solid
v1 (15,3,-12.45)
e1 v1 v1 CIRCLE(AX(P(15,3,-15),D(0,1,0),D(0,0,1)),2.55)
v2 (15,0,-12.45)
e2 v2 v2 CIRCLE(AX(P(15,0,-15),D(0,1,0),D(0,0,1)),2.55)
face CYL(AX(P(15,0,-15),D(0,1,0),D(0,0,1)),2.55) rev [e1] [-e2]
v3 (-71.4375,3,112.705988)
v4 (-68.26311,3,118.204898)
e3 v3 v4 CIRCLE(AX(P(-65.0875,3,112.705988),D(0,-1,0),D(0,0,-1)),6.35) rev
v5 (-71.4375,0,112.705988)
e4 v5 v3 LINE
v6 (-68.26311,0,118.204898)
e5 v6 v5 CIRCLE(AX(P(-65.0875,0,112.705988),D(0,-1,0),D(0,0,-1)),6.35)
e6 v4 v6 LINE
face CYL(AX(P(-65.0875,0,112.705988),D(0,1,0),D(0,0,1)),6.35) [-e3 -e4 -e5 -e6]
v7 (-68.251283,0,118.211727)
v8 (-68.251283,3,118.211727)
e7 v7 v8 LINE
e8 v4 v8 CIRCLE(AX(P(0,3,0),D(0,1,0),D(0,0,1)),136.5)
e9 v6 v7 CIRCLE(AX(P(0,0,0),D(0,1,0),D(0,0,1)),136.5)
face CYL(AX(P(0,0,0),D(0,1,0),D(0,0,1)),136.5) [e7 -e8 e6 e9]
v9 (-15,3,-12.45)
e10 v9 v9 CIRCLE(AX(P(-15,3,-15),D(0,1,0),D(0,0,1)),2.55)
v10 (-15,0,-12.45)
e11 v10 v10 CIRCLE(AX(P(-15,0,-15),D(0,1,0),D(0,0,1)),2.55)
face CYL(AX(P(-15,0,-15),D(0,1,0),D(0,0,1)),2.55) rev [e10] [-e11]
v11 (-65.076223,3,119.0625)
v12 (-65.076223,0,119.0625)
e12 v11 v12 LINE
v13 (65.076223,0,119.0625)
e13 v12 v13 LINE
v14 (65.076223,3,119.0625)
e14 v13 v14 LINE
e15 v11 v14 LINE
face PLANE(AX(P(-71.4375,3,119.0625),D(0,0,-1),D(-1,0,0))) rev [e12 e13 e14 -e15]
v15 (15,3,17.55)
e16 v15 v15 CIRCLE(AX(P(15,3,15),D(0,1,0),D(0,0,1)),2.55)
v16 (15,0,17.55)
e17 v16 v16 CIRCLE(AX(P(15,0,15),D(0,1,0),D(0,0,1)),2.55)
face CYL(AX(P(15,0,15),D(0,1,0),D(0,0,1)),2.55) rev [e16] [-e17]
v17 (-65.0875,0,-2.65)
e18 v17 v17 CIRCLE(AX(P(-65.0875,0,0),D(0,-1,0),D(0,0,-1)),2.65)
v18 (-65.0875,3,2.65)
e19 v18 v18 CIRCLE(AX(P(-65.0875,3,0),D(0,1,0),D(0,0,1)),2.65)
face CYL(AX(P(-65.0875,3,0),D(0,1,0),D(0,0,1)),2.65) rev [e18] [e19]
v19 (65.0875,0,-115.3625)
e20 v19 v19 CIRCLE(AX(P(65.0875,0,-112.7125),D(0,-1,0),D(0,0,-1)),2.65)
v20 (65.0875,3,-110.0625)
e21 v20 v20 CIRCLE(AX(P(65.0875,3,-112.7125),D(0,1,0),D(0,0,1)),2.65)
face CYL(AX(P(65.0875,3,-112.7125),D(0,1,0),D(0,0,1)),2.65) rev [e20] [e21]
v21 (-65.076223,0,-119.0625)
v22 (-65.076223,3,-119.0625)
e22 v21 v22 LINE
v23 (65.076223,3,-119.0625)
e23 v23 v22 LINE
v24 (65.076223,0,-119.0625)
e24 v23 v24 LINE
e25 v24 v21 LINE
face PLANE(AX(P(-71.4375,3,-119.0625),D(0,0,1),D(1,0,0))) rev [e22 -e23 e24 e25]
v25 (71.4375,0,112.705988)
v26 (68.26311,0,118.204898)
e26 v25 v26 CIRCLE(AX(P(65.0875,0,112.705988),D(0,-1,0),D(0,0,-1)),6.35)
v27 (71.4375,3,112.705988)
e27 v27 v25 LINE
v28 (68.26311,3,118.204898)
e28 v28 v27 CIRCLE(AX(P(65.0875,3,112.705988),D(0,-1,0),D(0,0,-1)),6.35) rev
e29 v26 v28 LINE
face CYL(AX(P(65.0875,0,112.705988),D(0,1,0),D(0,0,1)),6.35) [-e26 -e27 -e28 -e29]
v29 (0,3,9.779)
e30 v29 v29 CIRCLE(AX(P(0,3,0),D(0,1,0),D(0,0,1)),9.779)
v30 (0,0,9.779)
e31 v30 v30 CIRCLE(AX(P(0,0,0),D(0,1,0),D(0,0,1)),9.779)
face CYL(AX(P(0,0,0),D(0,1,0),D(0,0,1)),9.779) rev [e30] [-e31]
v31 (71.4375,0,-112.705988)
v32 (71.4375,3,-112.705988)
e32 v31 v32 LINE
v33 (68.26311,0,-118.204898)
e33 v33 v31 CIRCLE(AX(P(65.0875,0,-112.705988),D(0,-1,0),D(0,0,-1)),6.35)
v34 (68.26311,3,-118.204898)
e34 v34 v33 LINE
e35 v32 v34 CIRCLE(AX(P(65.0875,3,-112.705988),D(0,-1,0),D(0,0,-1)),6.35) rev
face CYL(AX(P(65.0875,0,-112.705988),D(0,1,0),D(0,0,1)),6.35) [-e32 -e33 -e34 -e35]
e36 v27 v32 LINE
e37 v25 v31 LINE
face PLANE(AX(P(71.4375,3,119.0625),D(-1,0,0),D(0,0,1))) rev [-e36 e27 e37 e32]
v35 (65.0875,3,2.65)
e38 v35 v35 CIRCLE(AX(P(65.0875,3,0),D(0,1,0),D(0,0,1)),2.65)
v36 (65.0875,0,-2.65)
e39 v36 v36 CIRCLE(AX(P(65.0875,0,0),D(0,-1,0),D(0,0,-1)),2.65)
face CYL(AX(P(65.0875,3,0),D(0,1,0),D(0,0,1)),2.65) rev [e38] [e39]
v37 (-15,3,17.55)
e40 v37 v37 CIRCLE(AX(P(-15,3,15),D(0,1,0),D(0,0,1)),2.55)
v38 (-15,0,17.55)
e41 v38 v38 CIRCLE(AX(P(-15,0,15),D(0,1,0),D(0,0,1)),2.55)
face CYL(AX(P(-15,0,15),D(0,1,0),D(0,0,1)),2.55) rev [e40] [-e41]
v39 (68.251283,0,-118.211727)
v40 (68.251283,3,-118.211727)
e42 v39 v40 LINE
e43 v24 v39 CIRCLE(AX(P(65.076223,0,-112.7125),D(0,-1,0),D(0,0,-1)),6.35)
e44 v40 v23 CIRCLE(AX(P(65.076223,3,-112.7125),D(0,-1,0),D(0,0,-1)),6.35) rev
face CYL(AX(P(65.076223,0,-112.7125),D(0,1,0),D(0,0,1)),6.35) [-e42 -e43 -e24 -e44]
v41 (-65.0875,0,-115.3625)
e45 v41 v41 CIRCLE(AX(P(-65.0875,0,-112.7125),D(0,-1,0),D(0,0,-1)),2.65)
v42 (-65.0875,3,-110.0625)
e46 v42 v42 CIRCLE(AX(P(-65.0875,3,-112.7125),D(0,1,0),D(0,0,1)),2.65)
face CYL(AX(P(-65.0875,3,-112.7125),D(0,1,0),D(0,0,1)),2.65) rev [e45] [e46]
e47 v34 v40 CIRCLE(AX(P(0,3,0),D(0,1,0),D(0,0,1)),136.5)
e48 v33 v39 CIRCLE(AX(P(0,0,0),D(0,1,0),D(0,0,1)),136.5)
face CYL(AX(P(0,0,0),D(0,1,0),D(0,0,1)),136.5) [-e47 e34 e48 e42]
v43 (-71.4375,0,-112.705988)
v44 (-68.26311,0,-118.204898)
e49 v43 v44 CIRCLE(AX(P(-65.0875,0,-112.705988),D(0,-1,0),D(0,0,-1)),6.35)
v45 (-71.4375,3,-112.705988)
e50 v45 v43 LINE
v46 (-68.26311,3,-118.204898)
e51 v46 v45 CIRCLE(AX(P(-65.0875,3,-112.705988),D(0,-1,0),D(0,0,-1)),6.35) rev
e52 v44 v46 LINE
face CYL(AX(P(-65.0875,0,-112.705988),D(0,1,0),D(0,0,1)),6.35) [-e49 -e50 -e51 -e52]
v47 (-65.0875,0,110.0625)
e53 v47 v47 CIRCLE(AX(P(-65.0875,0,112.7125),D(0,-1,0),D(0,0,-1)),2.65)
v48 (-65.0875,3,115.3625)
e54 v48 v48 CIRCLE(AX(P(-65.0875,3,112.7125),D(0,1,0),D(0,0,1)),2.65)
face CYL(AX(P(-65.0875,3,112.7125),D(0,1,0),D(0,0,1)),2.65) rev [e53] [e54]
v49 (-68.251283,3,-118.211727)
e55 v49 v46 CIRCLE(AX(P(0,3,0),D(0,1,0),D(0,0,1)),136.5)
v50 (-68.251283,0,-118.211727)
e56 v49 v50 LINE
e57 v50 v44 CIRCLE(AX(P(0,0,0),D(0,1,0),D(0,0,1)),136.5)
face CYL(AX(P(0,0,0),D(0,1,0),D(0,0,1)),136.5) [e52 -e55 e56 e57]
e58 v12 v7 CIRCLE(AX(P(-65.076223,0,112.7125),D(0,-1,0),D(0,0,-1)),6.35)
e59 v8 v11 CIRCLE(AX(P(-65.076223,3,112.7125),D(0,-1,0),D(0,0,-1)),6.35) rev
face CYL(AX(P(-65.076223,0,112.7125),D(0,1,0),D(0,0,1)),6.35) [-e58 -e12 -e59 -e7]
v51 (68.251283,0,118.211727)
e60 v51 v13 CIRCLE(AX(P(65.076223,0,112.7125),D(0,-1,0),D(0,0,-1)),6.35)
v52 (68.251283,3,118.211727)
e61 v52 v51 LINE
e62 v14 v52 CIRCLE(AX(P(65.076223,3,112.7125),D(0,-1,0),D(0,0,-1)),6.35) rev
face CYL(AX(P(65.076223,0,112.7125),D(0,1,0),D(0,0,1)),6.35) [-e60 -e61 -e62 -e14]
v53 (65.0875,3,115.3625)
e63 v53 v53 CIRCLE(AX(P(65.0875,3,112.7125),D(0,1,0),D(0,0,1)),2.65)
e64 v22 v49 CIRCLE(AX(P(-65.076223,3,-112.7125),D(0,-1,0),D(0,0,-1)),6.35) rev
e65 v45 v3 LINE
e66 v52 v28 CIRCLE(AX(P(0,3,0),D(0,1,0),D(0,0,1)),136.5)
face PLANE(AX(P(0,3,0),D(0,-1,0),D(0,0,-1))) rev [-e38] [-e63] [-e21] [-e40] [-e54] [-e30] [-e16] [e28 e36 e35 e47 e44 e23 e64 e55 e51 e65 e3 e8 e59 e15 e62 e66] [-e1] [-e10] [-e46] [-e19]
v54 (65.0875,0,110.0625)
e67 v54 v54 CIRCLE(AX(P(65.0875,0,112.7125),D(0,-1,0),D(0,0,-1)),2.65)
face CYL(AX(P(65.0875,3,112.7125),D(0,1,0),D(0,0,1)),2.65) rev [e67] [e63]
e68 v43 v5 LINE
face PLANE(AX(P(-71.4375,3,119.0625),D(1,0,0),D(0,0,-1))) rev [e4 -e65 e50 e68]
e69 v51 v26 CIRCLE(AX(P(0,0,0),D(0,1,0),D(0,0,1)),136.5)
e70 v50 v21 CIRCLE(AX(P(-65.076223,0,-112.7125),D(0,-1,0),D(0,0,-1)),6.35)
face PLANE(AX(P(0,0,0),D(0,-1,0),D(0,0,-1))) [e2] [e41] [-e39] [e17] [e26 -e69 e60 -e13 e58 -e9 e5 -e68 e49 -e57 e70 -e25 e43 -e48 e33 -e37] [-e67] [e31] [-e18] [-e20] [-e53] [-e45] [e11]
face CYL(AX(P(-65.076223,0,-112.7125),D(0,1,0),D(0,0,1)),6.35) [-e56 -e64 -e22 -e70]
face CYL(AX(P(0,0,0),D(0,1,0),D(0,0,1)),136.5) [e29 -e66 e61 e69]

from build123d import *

# Parameters (mm, degrees)
SKETCH1_W            = 142.875
SKETCH1_H            = 238.125
BOSS_EXTRUDE1_DEPTH  = 3
CUT_EXTRUDE1_START   = -3
CUT_EXTRUDE1_DEPTH   = 3
M5_CLEARANCE_HOLE1_D = 5.3
SKETCH5_R            = 9.779
SKETCH5_R_2          = 2.55
CUT_EXTRUDE2_DEPTH   = 139.881947396
FILLET1_R            = 6.35


# Read off the part's stored shape, not the designer's step: Cut-Extrude1
with BuildPart() as part:
    # Sketch1 → Boss-Extrude1 (new body)
    with BuildSketch(Plane(origin=(0, 0, 0), x_dir=(1, 0, 0), z_dir=(0, 1, 0))):
        Rectangle(SKETCH1_W, SKETCH1_H)
    extrude(amount=BOSS_EXTRUDE1_DEPTH)

    # Cut-Extrude1 outline → Cut-Extrude1 (cut)
    with BuildSketch(Plane(origin=(0, 3, 0), x_dir=(1, 0, 0), z_dir=(0, 1, 0)).offset(CUT_EXTRUDE1_START)):
        with BuildLine():
            ThreePointArc((71.4375, -116.313944107), (69.11044358, -117.711497264), (66.756056607, -119.0625))
            Line((66.756056607, -119.0625), (71.4375, -119.0625))
            Line((71.4375, -119.0625), (71.4375, -116.313944107))
        make_face()
        with BuildLine():
            Line((-71.4375, -119.0625), (-66.756056607, -119.0625))
            ThreePointArc((-66.756056607, -119.0625), (-69.11044358, -117.711497264), (-71.4375, -116.313944107))
            Line((-71.4375, -116.313944107), (-71.4375, -119.0625))
        make_face()
        with BuildLine():
            ThreePointArc((66.756056607, 119.0625), (69.11044358, 117.711497264), (71.4375, 116.313944107))
            Line((71.4375, 116.313944107), (71.4375, 119.0625))
            Line((71.4375, 119.0625), (66.756056607, 119.0625))
        make_face()
        with BuildLine():
            Line((-71.4375, 119.0625), (-71.4375, 116.313944107))
            ThreePointArc((-71.4375, 116.313944107), (-69.11044358, 117.711497264), (-66.756056607, 119.0625))
            Line((-66.756056607, 119.0625), (-71.4375, 119.0625))
        make_face()
    extrude(amount=CUT_EXTRUDE1_DEPTH, mode=Mode.SUBTRACT)

    # M5 Clearance Hole1 (through all)
    with Locations(Plane(origin=(0, 3, 0), x_dir=(1, 0, 0), z_dir=(0, 1, 0))):
        with Locations((65.0875, 0), (-65.0875, 112.7125), (65.0875, 112.7125), (65.0875, -112.7125), (-65.0875, -112.7125), (-65.0875, 0)):
            Hole(M5_CLEARANCE_HOLE1_D / 2)

    # Sketch5 → Cut-Extrude2 (cut, through all)
    with BuildSketch(Plane(origin=(0, 3, 0), x_dir=(1, 0, 0), z_dir=(0, 1, 0))):
        with Locations(Location((0, 0, 0), (0, 0, 270))):
            Circle(SKETCH5_R)
        with Locations(Location((-15, 15, 0), (0, 0, 270))):
            Circle(SKETCH5_R_2)
        with Locations(Location((15, 15, 0), (0, 0, 270))):
            Circle(SKETCH5_R_2)
        with Locations(Location((15, -15, 0), (0, 0, 270))):
            Circle(SKETCH5_R_2)
        with Locations(Location((-15, -15, 0), (0, 0, 270))):
            Circle(SKETCH5_R_2)
    extrude(amount=-CUT_EXTRUDE2_DEPTH, mode=Mode.SUBTRACT)

    # Fillet1
    fillet1_edges = [part.edges().sort_by_distance(p)[0] for p in [
        (71.4375, 1.5, 116.313944107),
        (71.4375, 1.5, -116.313944107),
        (66.756056607, 1.5, -119.0625),
        (-66.756056607, 1.5, -119.0625),
        (-71.4375, 1.5, -116.313944107),
        (-71.4375, 1.5, 116.313944107),
        (-66.756056607, 1.5, 119.0625),
        (66.756056607, 1.5, 119.0625),
    ]]
    fillet(fillet1_edges, radius=FILLET1_R)


solid = part.part
